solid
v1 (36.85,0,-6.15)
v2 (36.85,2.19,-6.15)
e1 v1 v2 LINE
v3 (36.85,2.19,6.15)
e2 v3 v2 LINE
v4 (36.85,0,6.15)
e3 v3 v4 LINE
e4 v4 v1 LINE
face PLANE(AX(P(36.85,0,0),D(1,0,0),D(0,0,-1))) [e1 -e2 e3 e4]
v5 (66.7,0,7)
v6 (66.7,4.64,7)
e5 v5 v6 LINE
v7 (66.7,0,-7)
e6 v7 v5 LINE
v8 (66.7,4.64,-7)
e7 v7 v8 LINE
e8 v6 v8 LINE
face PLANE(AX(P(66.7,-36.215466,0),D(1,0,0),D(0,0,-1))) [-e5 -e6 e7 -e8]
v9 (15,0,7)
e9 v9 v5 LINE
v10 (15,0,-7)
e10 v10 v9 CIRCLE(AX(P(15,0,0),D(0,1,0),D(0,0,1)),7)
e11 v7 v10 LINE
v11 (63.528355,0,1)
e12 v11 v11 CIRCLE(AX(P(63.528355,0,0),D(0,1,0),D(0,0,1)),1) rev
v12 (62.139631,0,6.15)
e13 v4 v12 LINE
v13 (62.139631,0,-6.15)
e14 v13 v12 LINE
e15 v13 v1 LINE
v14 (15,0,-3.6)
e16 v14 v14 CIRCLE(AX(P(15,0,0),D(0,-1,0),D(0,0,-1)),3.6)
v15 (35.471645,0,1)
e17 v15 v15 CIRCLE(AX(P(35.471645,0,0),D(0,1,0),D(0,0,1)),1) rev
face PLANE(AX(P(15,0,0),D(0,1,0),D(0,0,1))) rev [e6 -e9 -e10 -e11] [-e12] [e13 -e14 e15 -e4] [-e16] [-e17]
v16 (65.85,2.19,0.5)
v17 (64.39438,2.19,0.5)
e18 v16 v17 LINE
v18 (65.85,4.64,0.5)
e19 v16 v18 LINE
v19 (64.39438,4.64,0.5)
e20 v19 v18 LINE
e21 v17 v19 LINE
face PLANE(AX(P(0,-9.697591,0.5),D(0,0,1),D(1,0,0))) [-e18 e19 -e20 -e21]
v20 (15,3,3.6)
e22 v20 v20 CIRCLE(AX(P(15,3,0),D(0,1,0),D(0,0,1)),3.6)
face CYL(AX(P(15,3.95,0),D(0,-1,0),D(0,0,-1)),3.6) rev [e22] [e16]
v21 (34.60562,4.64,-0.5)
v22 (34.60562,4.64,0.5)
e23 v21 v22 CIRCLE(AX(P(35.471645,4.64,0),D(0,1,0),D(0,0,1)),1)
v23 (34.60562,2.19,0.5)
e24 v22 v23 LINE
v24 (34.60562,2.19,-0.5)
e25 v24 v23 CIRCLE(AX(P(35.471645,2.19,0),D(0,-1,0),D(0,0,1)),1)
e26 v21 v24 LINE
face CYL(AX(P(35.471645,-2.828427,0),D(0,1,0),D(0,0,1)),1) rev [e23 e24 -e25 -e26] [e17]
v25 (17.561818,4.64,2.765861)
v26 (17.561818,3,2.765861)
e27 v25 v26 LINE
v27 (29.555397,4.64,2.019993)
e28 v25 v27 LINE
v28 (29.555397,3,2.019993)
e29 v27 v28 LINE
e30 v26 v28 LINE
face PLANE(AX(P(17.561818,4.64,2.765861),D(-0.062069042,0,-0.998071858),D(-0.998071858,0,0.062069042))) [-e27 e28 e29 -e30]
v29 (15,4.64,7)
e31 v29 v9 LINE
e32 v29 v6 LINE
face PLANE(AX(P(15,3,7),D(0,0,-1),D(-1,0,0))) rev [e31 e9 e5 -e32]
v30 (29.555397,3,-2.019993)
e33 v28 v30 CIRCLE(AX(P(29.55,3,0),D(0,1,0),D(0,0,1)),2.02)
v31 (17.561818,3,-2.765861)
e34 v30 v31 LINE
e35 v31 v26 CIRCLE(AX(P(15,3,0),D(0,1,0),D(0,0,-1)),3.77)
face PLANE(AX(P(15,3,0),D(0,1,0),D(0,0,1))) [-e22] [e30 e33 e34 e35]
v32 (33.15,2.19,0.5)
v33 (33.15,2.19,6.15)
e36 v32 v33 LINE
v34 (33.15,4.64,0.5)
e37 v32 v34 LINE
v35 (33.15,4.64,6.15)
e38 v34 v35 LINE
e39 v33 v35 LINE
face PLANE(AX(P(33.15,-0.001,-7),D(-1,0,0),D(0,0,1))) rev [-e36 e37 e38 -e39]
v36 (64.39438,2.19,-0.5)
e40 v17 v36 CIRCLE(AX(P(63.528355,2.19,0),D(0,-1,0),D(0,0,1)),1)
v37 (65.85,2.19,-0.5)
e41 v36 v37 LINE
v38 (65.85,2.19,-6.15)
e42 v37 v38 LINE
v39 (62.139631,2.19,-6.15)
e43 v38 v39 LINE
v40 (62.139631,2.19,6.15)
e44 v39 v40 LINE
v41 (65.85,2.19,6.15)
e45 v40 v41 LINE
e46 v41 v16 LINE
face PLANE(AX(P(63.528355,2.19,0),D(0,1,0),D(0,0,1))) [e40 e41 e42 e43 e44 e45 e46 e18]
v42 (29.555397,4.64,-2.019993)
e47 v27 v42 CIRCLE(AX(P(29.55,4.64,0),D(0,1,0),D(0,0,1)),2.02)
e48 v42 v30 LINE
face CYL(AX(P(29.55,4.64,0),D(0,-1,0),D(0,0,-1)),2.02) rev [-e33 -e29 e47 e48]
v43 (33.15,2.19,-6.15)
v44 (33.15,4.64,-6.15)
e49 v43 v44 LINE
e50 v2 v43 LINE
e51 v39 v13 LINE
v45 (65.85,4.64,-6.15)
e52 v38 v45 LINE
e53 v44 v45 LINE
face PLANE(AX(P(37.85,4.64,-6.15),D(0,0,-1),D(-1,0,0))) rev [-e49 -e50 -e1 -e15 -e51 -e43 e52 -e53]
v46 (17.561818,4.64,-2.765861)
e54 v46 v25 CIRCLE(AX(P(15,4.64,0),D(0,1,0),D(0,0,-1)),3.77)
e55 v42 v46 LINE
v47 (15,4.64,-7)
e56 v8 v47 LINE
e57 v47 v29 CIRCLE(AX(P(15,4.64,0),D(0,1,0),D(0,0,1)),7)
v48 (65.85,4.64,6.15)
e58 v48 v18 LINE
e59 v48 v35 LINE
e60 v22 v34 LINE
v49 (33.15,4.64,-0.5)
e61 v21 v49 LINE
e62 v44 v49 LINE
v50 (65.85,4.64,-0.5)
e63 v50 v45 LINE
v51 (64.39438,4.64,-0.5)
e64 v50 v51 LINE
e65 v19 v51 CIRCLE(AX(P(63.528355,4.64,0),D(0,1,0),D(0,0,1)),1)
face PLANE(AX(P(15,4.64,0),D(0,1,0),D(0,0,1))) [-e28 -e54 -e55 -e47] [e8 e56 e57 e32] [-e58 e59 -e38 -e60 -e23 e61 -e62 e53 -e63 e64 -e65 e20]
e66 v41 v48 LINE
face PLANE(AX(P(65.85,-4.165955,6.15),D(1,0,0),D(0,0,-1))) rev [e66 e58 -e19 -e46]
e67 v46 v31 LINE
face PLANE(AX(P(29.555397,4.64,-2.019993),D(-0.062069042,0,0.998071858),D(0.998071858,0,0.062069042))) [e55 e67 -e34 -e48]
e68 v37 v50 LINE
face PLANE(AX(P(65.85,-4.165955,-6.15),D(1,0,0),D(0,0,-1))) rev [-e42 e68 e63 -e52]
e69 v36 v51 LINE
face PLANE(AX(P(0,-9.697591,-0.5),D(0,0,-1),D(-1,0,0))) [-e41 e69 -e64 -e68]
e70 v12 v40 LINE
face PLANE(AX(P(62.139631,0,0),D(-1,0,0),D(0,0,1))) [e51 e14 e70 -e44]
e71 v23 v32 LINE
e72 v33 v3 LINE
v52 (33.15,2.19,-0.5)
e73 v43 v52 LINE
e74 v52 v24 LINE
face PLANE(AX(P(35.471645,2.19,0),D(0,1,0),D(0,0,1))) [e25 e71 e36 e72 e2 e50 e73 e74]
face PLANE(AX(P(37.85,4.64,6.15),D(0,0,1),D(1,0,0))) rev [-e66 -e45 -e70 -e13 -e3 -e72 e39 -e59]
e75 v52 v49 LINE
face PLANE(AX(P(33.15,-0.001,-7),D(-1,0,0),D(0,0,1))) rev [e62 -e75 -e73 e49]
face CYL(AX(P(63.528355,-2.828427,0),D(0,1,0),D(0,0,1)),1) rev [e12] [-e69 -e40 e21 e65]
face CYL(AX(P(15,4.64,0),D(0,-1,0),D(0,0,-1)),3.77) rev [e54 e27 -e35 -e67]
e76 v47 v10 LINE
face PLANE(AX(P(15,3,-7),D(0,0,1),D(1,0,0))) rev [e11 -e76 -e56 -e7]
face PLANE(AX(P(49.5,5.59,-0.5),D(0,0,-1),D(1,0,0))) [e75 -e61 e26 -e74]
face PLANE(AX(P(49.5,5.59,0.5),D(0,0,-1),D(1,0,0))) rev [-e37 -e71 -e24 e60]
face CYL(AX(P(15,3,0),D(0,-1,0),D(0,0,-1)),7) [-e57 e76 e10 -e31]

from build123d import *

# Parameters (mm, degrees)
BOSS_EXTRUDE1_DEPTH       = 3
SKETCH2_R                 = 3.6
CUT_EXTRUDE1_DEPTH        = 3.95
BOSS_EXTRUDE2_DEPTH       = 1.64
SKETCH4_R                 = 3.25
CUT_EXTRUDE2_DEPTH        = 63.566201739
CAVITY1_OUTLINE_R         = 3.25
CAVITY1_DEPTH             = 4.64
CAVITY1_START             = 3.19
CAVITY1_2_DEPTH           = 1.45
CUT_EXTRUDE4_DEPTH        = 63.566201739
BOSS_EXTRUDE3_START       = -4.64
BOSS_EXTRUDE3_DEPTH       = 4.64
BOSS_EXTRUDE4_DEPTH       = 4.64
BOSS_EXTRUDE5_DEPTH       = 4.64
CUT_EXTRUDE5_DEPTH        = 1.45
SKETCH7_R                 = 1
CUT_EXTRUDE6_DEPTH        = 4.64
CUT_EXTRUDE7_DEPTH        = 68.226628653
CUT_EXTRUDE7_DEPTH_BACK   = 68.226628653
SKETCH10_W                = 23.28963149
SKETCH10_H                = 12.3
SKETCH10_W_2              = 22.98963149
SKETCH10_H_2              = 12
CUT_EXTRUDE8_DEPTH        = 1.45
CUT_EXTRUDE9_DEPTH        = 1.45
SKETCH14_W                = 12.3
SKETCH14_H                = 3.19
CUT_EXTRUDE10_DEPTH       = 1
SKETCH15_W                = 12.3
SKETCH15_H                = 3.19
CUT_EXTRUDE11_DEPTH       = 1
CUT_EXTRUDE12_DEPTH       = 1
CUT_EXTRUDE13_DEPTH       = 1
CUT_EXTRUDE14_REACH       = 69.227
SKETCH18_W                = 15
SKETCH18_H                = 14
BODY_MOVE_COPY1_OUTLINE_R = 3.6
BODY_MOVE_COPY1_DEPTH     = 4.64
BODY_MOVE_COPY1_START     = 3
BODY_MOVE_COPY1_2_DEPTH   = 1.64
BODY_MOVE_COPY1_3_DEPTH   = 4.64
BODY_MOVE_COPY1_4_DEPTH   = 3


# Read off the part's stored shape, not the designer's step: Cavity1, Body-Move/Copy1
with BuildPart() as part:
    # Sketch1 → Boss-Extrude1 (new body)
    with BuildSketch(Plane(origin=(0, 0, 0), x_dir=(1, 0, 0), z_dir=(0, 1, 0))):
        with BuildLine():
            Line((0, 7), (55, 7))
            ThreePointArc((55, 7), (62, 0), (55, -7))
            Line((55, -7), (0, -7))
            ThreePointArc((0, -7), (-7, 0), (0, 7))
        make_face()
    extrude(amount=BOSS_EXTRUDE1_DEPTH)

    # Sketch2 → Cut-Extrude1 (cut)
    with BuildSketch(Plane.XZ):
        with Locations(Location((0, 0, 0), (0, 0, 270))):
            Circle(SKETCH2_R)
    extrude(amount=-CUT_EXTRUDE1_DEPTH, mode=Mode.SUBTRACT)

    # Sketch3 → Boss-Extrude2 (add)
    with BuildSketch(Plane(origin=(0, 3, 0), x_dir=(1, 0, 0), z_dir=(0, 1, 0))):
        with BuildLine():
            Line((0, -7), (55, -7))
            ThreePointArc((55, -7), (62, 0), (55, 7))
            Line((55, 7), (0, 7))
            ThreePointArc((0, 7), (-7, 0), (0, -7))
        make_face()
        with BuildLine():
            Line((14.555396889, 2.01999279), (2.561818442, 2.765860855))
            ThreePointArc((2.561818442, 2.765860855), (-3.77, 0), (2.561818442, -2.765860855))
            Line((2.561818442, -2.765860855), (14.555396889, -2.01999279))
            ThreePointArc((14.555396889, -2.01999279), (16.57, 0), (14.555396889, 2.01999279))
        make_face(mode=Mode.SUBTRACT)
    extrude(amount=BOSS_EXTRUDE2_DEPTH)

    # Sketch4 → Cut-Extrude2 (cut, through all)
    with BuildSketch(Plane(origin=(0, 4.64, 0), x_dir=(1, 0, 0), z_dir=(0, 1, 0))):
        with Locations(Location((55, 0, 0), (0, 0, 270))):
            Circle(SKETCH4_R)
    extrude(amount=-CUT_EXTRUDE2_DEPTH, mode=Mode.SUBTRACT)

    # Cavity1 outline → Cavity1 (cut)
    with BuildSketch(Plane(origin=(0, 0, 0), x_dir=(1, 0, 0), z_dir=(0, 1, 0))):
        with BuildLine():
            Line((58.605551275, 6), (38, 6))
            Line((38, 6), (38, -6))
            Line((38, -6), (58.605551275, -6))
            ThreePointArc((58.605551275, -6), (59.949747468, -4.949747468), (61, -3.605551275))
            Line((61, -3.605551275), (61, 3.605551275))
            ThreePointArc((61, 3.605551275), (59.949747468, 4.949747468), (58.605551275, 6))
        make_face()
        with Locations((55, 0)):
            Circle(CAVITY1_OUTLINE_R, mode=Mode.SUBTRACT)
    extrude(amount=CAVITY1_DEPTH, mode=Mode.SUBTRACT)

    # Cavity1 2 outline → Cavity1 2 (cut)
    with BuildSketch(Plane(origin=(0, 0, 0), x_dir=(1, 0, 0), z_dir=(0, 1, 0)).offset(CAVITY1_START)):
        with BuildLine():
            Line((33.3, 0.5), (34.605619966, 0.5))
            ThreePointArc((34.605619966, 0.5), (36.47164537, 0), (34.605619966, -0.5))
            Line((34.605619966, -0.5), (33.3, -0.5))
            Line((33.3, -0.5), (33.3, -6))
            Line((33.3, -6), (38, -6))
            Line((38, -6), (38, 6))
            Line((38, 6), (33.3, 6))
            Line((33.3, 6), (33.3, 0.5))
        make_face()
        with BuildLine():
            ThreePointArc((61, -3.605551275), (62, 0), (61, 3.605551275))
            Line((61, 3.605551275), (61, -3.605551275))
        make_face()
    extrude(amount=CAVITY1_2_DEPTH, mode=Mode.SUBTRACT)

    # Sketch5 → Cut-Extrude4 (cut, through all)
    with BuildSketch(Plane.XZ):
        with BuildLine():
            Line((61, 3.605551275), (61, -3.605551275))
            ThreePointArc((61, -3.605551275), (62, 0), (61, 3.605551275))
        make_face()
    extrude(amount=-CUT_EXTRUDE4_DEPTH, mode=Mode.SUBTRACT)

    # Sketch6 → Boss-Extrude3 (add)
    with BuildSketch(Plane(origin=(0, 4.64, 0), x_dir=(1, 0, 0), z_dir=(0, 1, 0)).offset(BOSS_EXTRUDE3_START)):
        with BuildLine():
            Line((61, -6), (58.605551275, -6))
            ThreePointArc((58.605551275, -6), (56.870828693, -6.745368782), (55, -7))
            Line((55, -7), (66.7, -7))
            Line((66.7, -7), (66.7, 7))
            Line((66.7, 7), (55, 7))
            ThreePointArc((55, 7), (56.870828693, 6.745368782), (58.605551275, 6))
            Line((58.605551275, 6), (61, 6))
            Line((61, 6), (65.7, 6))
            Line((65.7, 6), (65.7, 0.5))
            Line((65.7, 0.5), (65.7, -0.5))
            Line((65.7, -0.5), (65.7, -6))
            Line((65.7, -6), (61, -6))
        make_face()
        with BuildLine():
            Line((58.605551275, -6), (33.3, -6))
            Line((33.3, -6), (33.3, -7))
            Line((33.3, -7), (55, -7))
            ThreePointArc((55, -7), (56.870828693, -6.745368782), (58.605551275, -6))
        make_face()
        with BuildLine():
            Line((33.3, 7), (33.3, 6))
            Line((33.3, 6), (58.605551275, 6))
            ThreePointArc((58.605551275, 6), (56.870828693, 6.745368782), (55, 7))
            Line((55, 7), (33.3, 7))
        make_face()
    extrude(amount=BOSS_EXTRUDE3_DEPTH)

    # Sketch6<3> → Boss-Extrude4 (add)
    with BuildSketch(Plane(origin=(0, 4.64, 0), x_dir=(1, 0, 0), z_dir=(0, 1, 0))):
        with BuildLine():
            Line((64.394380034, -0.5), (65.7, -0.5))
            Line((65.7, -0.5), (65.7, 0.5))
            Line((65.7, 0.5), (64.394380034, 0.5))
            ThreePointArc((64.394380034, 0.5), (62.52835463, 0), (64.394380034, -0.5))
        make_face()
    extrude(amount=-BOSS_EXTRUDE4_DEPTH)

    # Sketch6<5> → Boss-Extrude5 (add)
    with BuildSketch(Plane(origin=(0, 4.64, 0), x_dir=(1, 0, 0), z_dir=(0, 1, 0))):
        with BuildLine():
            Line((61, 6), (61, -6))
            Line((61, -6), (65.7, -6))
            Line((65.7, -6), (65.7, -0.5))
            Line((65.7, -0.5), (64.394380034, -0.5))
            ThreePointArc((64.394380034, -0.5), (62.52835463, 0), (64.394380034, 0.5))
            Line((64.394380034, 0.5), (65.7, 0.5))
            Line((65.7, 0.5), (65.7, 6))
            Line((65.7, 6), (61, 6))
        make_face()
    extrude(amount=-BOSS_EXTRUDE5_DEPTH)

    # Sketch6<6> → Cut-Extrude5 (cut)
    with BuildSketch(Plane(origin=(0, 4.64, 0), x_dir=(1, 0, 0), z_dir=(0, 1, 0))):
        with BuildLine():
            Line((61, 6), (61, -6))
            Line((61, -6), (65.7, -6))
            Line((65.7, -6), (65.7, -0.5))
            Line((65.7, -0.5), (64.394380034, -0.5))
            ThreePointArc((64.394380034, -0.5), (62.52835463, 0), (64.394380034, 0.5))
            Line((64.394380034, 0.5), (65.7, 0.5))
            Line((65.7, 0.5), (65.7, 6))
            Line((65.7, 6), (61, 6))
        make_face()
    extrude(amount=-CUT_EXTRUDE5_DEPTH, mode=Mode.SUBTRACT)

    # Sketch7 → Cut-Extrude6 (cut)
    with BuildSketch(Plane(origin=(0, 4.64, 0), x_dir=(1, 0, 0), z_dir=(0, 1, 0))):
        with Locations(Location((63.52835463, 0, 0), (0, 0, 270))):
            Circle(SKETCH7_R)
        with Locations(Location((35.47164537, 0, 0), (0, 0, 270))):
            Circle(SKETCH7_R)
    extrude(amount=-CUT_EXTRUDE6_DEPTH, mode=Mode.SUBTRACT)

    # Sketch10 → Cut-Extrude7 (cut, two sides: drawn at the far end of the back side and taken through both)
    with BuildSketch(Plane.XZ.offset(-CUT_EXTRUDE7_DEPTH_BACK)):
        with Locations((49.494815745, 0)):
            Rectangle(SKETCH10_W, SKETCH10_H)
        with Locations((49.494815745, 0)):
            Rectangle(SKETCH10_W_2, SKETCH10_H_2, mode=Mode.SUBTRACT)
    extrude(amount=CUT_EXTRUDE7_DEPTH + CUT_EXTRUDE7_DEPTH_BACK, mode=Mode.SUBTRACT)

    # Sketch11 → Cut-Extrude8 (cut)
    with BuildSketch(Plane(origin=(0, 4.64, 0), x_dir=(1, 0, 0), z_dir=(0, 1, 0))):
        Polygon((37.85, -6), (33.3, -6), (33.3, -0.5), (33.15, -0.5), (33.15, -6.15), (37.85, -6.15), align=None)
        Polygon((33.3, 0.5), (33.3, 6), (37.85, 6), (37.85, 6.15), (33.15, 6.15), (33.15, 0.5), align=None)
    extrude(amount=-CUT_EXTRUDE8_DEPTH, mode=Mode.SUBTRACT)

    # Sketch13 → Cut-Extrude9 (cut)
    with BuildSketch(Plane(origin=(0, 4.64, 0), x_dir=(1, 0, 0), z_dir=(0, 1, 0))):
        Polygon((61.13963149, -6), (65.7, -6), (65.7, -0.5), (65.85, -0.5), (65.85, -6.15), (61.13963149, -6.15), align=None)
        Polygon((61.13963149, 6), (65.7, 6), (65.7, 0.5), (65.85, 0.5), (65.85, 6.15), (61.13963149, 6.15), align=None)
    extrude(amount=-CUT_EXTRUDE9_DEPTH, mode=Mode.SUBTRACT)

    # Sketch14 → Cut-Extrude10 (cut)
    with BuildSketch(Plane(origin=(37.85, 0, 0), x_dir=(0, 0, -1), z_dir=(1, 0, 0))):
        with Locations((0, 1.595)):
            Rectangle(SKETCH14_W, SKETCH14_H)
    extrude(amount=-CUT_EXTRUDE10_DEPTH, mode=Mode.SUBTRACT)

    # Sketch15 → Cut-Extrude11 (cut)
    with BuildSketch(Plane.ZY.offset(-61.13963149)):
        with Locations((0, 1.595)):
            Rectangle(SKETCH15_W, SKETCH15_H)
    extrude(amount=-CUT_EXTRUDE11_DEPTH, mode=Mode.SUBTRACT)

    # Sketch16 → Cut-Extrude12 (cut)
    with BuildSketch(Plane(origin=(0, 3.19, 0), x_dir=(1, 0, 0), z_dir=(0, 1, 0))):
        with BuildLine():
            Line((62.13963149, 6.15), (62.13963149, -6.15))
            Line((62.13963149, -6.15), (65.85, -6.15))
            Line((65.85, -6.15), (65.85, -0.5))
            Line((65.85, -0.5), (64.394380034, -0.5))
            ThreePointArc((64.394380034, -0.5), (62.52835463, 0), (64.394380034, 0.5))
            Line((64.394380034, 0.5), (65.85, 0.5))
            Line((65.85, 0.5), (65.85, 6.15))
            Line((65.85, 6.15), (62.13963149, 6.15))
        make_face()
    extrude(amount=-CUT_EXTRUDE12_DEPTH, mode=Mode.SUBTRACT)

    # Sketch17 → Cut-Extrude13 (cut)
    with BuildSketch(Plane(origin=(0, 3.19, 0), x_dir=(1, 0, 0), z_dir=(0, 1, 0))):
        with BuildLine():
            Line((36.85, -6.15), (36.85, 6.15))
            Line((36.85, 6.15), (33.15, 6.15))
            Line((33.15, 6.15), (33.15, 0.5))
            Line((33.15, 0.5), (34.605619966, 0.5))
            ThreePointArc((34.605619966, 0.5), (36.47164537, 0), (34.605619966, -0.5))
            Line((34.605619966, -0.5), (33.15, -0.5))
            Line((33.15, -0.5), (33.15, -6.15))
            Line((33.15, -6.15), (36.85, -6.15))
        make_face()
    extrude(amount=-CUT_EXTRUDE13_DEPTH, mode=Mode.SUBTRACT)

    # Sketch18 → Cut-Extrude14 (cut, up to next)
    with BuildSketch(Plane(origin=(0, 4.64, 0), x_dir=(1, 0, 0), z_dir=(0, 1, 0)), mode=Mode.PRIVATE) as cut_extrude14_sk1:
        with Locations((25.65, 0)):
            Rectangle(SKETCH18_W, SKETCH18_H)
    cut_extrude14_tool1 = extrude(cut_extrude14_sk1.sketch, amount=-CUT_EXTRUDE14_REACH, mode=Mode.PRIVATE) & part.part
    add(cut_extrude14_tool1.solids().sort_by_distance((25.65, 4.64, 0))[0], mode=Mode.SUBTRACT)


with BuildPart() as cut_extrude14_piece_1:
    # of the separate pieces the step leaves, piece 1, a body of its own (cut_extrude14_pieces)
    add(part.part.solids().sort_by_distance((18.15, 0, -7))[0])

    # Body-Move/Copy1 outline → Body-Move/Copy1 (cut)
    # profile 1 of 2: a face of its own
    with BuildSketch(Plane(origin=(0, 0, 0), x_dir=(1, 0, 0), z_dir=(0, 1, 0))):
        with BuildLine():
            Line((15, 7), (0, 7))
            ThreePointArc((0, 7), (-7, 0), (0, -7))
            Line((0, -7), (15, -7))
            ThreePointArc((15, -7), (8, 0), (15, 7))
        make_face()
        Circle(BODY_MOVE_COPY1_OUTLINE_R, mode=Mode.SUBTRACT)
    # profile 2 of 2: a face of its own
    with BuildSketch(Plane(origin=(0, 0, 0), x_dir=(1, 0, 0), z_dir=(0, 1, 0))):
        with BuildLine():
            Line((18.15, -1.742842506), (18.15, 1.742842506))
            ThreePointArc((18.15, 1.742842506), (11.4, 0), (18.15, -1.742842506))
        make_face()
    extrude(amount=BODY_MOVE_COPY1_DEPTH, mode=Mode.SUBTRACT)

    # Body-Move_Copy1 2 outline → Body-Move_Copy1 2 (cut)
    with BuildSketch(Plane(origin=(0, 0, 0), x_dir=(1, 0, 0), z_dir=(0, 1, 0)).offset(BODY_MOVE_COPY1_START)):
        with BuildLine():
            Line((18.15, 1.742842506), (18.15, 2.729282461))
            Line((18.15, 2.729282461), (17.561818442, 2.765860855))
            ThreePointArc((17.561818442, 2.765860855), (14.612436332, 3.75002592), (11.926670151, 2.183470549))
            Line((11.926670151, 2.183470549), (12.128234154, 2.170935495))
            ThreePointArc((12.128234154, 2.170935495), (15.255283103, 3.590937278), (18.15, 1.742842506))
        make_face()
        with BuildLine():
            Line((12.128234154, -2.170935495), (11.926670151, -2.183470549))
            ThreePointArc((11.926670151, -2.183470549), (14.612436332, -3.75002592), (17.561818442, -2.765860855))
            Line((17.561818442, -2.765860855), (18.15, -2.729282461))
            Line((18.15, -2.729282461), (18.15, -1.742842506))
            ThreePointArc((18.15, -1.742842506), (15.255283103, -3.590937278), (12.128234154, -2.170935495))
        make_face()
    extrude(amount=BODY_MOVE_COPY1_2_DEPTH, mode=Mode.SUBTRACT)

    # Body-Move_Copy1 3 outline → Body-Move_Copy1 3 (add)
    with BuildSketch(Plane(origin=(0, 0, 0), x_dir=(1, 0, 0), z_dir=(0, 1, 0))):
        with BuildLine():
            Line((33.15, 7), (18.15, 7))
            Line((18.15, 7), (18.15, 2.729282461))
            Line((18.15, 2.729282461), (29.555396889, 2.01999279))
            ThreePointArc((29.555396889, 2.01999279), (31.57, 0), (29.555396889, -2.01999279))
            Line((29.555396889, -2.01999279), (18.15, -2.729282461))
            Line((18.15, -2.729282461), (18.15, -7))
            Line((18.15, -7), (33.15, -7))
            Line((33.15, -7), (33.15, 7))
        make_face()
        with BuildLine():
            Line((11.926670151, 2.183470549), (8.424744076, 2.401251659))
            ThreePointArc((8.424744076, 2.401251659), (8, 0), (8.424744076, -2.401251659))
            Line((8.424744076, -2.401251659), (11.926670151, -2.183470549))
            ThreePointArc((11.926670151, -2.183470549), (11.23, 0), (11.926670151, 2.183470549))
        make_face()
    extrude(amount=BODY_MOVE_COPY1_3_DEPTH)

    # Body-Move_Copy1 4 outline → Body-Move_Copy1 4 (add)
    with BuildSketch(Plane(origin=(0, 0, 0), x_dir=(1, 0, 0), z_dir=(0, 1, 0))):
        with BuildLine():
            Line((29.555396889, 2.01999279), (18.15, 2.729282461))
            Line((18.15, 2.729282461), (18.15, 1.742842506))
            ThreePointArc((18.15, 1.742842506), (18.6, 0), (18.15, -1.742842506))
            Line((18.15, -1.742842506), (18.15, -2.729282461))
            Line((18.15, -2.729282461), (29.555396889, -2.01999279))
            ThreePointArc((29.555396889, -2.01999279), (31.57, 0), (29.555396889, 2.01999279))
        make_face()
    extrude(amount=BODY_MOVE_COPY1_4_DEPTH)


with BuildPart() as cut_extrude14_piece_2:
    # of the separate pieces the step leaves, piece 2, a body of its own (cut_extrude14_pieces)
    add(part.part.solids().sort_by_distance((66.7, 0, -7))[0])


with BuildPart() as cut_extrude14_piece_1_1:
    add(cut_extrude14_piece_1.part)

    # Combine1: union Cut-Extrude14 piece 2
    add(cut_extrude14_piece_2.part)


solid = cut_extrude14_piece_1_1.part
